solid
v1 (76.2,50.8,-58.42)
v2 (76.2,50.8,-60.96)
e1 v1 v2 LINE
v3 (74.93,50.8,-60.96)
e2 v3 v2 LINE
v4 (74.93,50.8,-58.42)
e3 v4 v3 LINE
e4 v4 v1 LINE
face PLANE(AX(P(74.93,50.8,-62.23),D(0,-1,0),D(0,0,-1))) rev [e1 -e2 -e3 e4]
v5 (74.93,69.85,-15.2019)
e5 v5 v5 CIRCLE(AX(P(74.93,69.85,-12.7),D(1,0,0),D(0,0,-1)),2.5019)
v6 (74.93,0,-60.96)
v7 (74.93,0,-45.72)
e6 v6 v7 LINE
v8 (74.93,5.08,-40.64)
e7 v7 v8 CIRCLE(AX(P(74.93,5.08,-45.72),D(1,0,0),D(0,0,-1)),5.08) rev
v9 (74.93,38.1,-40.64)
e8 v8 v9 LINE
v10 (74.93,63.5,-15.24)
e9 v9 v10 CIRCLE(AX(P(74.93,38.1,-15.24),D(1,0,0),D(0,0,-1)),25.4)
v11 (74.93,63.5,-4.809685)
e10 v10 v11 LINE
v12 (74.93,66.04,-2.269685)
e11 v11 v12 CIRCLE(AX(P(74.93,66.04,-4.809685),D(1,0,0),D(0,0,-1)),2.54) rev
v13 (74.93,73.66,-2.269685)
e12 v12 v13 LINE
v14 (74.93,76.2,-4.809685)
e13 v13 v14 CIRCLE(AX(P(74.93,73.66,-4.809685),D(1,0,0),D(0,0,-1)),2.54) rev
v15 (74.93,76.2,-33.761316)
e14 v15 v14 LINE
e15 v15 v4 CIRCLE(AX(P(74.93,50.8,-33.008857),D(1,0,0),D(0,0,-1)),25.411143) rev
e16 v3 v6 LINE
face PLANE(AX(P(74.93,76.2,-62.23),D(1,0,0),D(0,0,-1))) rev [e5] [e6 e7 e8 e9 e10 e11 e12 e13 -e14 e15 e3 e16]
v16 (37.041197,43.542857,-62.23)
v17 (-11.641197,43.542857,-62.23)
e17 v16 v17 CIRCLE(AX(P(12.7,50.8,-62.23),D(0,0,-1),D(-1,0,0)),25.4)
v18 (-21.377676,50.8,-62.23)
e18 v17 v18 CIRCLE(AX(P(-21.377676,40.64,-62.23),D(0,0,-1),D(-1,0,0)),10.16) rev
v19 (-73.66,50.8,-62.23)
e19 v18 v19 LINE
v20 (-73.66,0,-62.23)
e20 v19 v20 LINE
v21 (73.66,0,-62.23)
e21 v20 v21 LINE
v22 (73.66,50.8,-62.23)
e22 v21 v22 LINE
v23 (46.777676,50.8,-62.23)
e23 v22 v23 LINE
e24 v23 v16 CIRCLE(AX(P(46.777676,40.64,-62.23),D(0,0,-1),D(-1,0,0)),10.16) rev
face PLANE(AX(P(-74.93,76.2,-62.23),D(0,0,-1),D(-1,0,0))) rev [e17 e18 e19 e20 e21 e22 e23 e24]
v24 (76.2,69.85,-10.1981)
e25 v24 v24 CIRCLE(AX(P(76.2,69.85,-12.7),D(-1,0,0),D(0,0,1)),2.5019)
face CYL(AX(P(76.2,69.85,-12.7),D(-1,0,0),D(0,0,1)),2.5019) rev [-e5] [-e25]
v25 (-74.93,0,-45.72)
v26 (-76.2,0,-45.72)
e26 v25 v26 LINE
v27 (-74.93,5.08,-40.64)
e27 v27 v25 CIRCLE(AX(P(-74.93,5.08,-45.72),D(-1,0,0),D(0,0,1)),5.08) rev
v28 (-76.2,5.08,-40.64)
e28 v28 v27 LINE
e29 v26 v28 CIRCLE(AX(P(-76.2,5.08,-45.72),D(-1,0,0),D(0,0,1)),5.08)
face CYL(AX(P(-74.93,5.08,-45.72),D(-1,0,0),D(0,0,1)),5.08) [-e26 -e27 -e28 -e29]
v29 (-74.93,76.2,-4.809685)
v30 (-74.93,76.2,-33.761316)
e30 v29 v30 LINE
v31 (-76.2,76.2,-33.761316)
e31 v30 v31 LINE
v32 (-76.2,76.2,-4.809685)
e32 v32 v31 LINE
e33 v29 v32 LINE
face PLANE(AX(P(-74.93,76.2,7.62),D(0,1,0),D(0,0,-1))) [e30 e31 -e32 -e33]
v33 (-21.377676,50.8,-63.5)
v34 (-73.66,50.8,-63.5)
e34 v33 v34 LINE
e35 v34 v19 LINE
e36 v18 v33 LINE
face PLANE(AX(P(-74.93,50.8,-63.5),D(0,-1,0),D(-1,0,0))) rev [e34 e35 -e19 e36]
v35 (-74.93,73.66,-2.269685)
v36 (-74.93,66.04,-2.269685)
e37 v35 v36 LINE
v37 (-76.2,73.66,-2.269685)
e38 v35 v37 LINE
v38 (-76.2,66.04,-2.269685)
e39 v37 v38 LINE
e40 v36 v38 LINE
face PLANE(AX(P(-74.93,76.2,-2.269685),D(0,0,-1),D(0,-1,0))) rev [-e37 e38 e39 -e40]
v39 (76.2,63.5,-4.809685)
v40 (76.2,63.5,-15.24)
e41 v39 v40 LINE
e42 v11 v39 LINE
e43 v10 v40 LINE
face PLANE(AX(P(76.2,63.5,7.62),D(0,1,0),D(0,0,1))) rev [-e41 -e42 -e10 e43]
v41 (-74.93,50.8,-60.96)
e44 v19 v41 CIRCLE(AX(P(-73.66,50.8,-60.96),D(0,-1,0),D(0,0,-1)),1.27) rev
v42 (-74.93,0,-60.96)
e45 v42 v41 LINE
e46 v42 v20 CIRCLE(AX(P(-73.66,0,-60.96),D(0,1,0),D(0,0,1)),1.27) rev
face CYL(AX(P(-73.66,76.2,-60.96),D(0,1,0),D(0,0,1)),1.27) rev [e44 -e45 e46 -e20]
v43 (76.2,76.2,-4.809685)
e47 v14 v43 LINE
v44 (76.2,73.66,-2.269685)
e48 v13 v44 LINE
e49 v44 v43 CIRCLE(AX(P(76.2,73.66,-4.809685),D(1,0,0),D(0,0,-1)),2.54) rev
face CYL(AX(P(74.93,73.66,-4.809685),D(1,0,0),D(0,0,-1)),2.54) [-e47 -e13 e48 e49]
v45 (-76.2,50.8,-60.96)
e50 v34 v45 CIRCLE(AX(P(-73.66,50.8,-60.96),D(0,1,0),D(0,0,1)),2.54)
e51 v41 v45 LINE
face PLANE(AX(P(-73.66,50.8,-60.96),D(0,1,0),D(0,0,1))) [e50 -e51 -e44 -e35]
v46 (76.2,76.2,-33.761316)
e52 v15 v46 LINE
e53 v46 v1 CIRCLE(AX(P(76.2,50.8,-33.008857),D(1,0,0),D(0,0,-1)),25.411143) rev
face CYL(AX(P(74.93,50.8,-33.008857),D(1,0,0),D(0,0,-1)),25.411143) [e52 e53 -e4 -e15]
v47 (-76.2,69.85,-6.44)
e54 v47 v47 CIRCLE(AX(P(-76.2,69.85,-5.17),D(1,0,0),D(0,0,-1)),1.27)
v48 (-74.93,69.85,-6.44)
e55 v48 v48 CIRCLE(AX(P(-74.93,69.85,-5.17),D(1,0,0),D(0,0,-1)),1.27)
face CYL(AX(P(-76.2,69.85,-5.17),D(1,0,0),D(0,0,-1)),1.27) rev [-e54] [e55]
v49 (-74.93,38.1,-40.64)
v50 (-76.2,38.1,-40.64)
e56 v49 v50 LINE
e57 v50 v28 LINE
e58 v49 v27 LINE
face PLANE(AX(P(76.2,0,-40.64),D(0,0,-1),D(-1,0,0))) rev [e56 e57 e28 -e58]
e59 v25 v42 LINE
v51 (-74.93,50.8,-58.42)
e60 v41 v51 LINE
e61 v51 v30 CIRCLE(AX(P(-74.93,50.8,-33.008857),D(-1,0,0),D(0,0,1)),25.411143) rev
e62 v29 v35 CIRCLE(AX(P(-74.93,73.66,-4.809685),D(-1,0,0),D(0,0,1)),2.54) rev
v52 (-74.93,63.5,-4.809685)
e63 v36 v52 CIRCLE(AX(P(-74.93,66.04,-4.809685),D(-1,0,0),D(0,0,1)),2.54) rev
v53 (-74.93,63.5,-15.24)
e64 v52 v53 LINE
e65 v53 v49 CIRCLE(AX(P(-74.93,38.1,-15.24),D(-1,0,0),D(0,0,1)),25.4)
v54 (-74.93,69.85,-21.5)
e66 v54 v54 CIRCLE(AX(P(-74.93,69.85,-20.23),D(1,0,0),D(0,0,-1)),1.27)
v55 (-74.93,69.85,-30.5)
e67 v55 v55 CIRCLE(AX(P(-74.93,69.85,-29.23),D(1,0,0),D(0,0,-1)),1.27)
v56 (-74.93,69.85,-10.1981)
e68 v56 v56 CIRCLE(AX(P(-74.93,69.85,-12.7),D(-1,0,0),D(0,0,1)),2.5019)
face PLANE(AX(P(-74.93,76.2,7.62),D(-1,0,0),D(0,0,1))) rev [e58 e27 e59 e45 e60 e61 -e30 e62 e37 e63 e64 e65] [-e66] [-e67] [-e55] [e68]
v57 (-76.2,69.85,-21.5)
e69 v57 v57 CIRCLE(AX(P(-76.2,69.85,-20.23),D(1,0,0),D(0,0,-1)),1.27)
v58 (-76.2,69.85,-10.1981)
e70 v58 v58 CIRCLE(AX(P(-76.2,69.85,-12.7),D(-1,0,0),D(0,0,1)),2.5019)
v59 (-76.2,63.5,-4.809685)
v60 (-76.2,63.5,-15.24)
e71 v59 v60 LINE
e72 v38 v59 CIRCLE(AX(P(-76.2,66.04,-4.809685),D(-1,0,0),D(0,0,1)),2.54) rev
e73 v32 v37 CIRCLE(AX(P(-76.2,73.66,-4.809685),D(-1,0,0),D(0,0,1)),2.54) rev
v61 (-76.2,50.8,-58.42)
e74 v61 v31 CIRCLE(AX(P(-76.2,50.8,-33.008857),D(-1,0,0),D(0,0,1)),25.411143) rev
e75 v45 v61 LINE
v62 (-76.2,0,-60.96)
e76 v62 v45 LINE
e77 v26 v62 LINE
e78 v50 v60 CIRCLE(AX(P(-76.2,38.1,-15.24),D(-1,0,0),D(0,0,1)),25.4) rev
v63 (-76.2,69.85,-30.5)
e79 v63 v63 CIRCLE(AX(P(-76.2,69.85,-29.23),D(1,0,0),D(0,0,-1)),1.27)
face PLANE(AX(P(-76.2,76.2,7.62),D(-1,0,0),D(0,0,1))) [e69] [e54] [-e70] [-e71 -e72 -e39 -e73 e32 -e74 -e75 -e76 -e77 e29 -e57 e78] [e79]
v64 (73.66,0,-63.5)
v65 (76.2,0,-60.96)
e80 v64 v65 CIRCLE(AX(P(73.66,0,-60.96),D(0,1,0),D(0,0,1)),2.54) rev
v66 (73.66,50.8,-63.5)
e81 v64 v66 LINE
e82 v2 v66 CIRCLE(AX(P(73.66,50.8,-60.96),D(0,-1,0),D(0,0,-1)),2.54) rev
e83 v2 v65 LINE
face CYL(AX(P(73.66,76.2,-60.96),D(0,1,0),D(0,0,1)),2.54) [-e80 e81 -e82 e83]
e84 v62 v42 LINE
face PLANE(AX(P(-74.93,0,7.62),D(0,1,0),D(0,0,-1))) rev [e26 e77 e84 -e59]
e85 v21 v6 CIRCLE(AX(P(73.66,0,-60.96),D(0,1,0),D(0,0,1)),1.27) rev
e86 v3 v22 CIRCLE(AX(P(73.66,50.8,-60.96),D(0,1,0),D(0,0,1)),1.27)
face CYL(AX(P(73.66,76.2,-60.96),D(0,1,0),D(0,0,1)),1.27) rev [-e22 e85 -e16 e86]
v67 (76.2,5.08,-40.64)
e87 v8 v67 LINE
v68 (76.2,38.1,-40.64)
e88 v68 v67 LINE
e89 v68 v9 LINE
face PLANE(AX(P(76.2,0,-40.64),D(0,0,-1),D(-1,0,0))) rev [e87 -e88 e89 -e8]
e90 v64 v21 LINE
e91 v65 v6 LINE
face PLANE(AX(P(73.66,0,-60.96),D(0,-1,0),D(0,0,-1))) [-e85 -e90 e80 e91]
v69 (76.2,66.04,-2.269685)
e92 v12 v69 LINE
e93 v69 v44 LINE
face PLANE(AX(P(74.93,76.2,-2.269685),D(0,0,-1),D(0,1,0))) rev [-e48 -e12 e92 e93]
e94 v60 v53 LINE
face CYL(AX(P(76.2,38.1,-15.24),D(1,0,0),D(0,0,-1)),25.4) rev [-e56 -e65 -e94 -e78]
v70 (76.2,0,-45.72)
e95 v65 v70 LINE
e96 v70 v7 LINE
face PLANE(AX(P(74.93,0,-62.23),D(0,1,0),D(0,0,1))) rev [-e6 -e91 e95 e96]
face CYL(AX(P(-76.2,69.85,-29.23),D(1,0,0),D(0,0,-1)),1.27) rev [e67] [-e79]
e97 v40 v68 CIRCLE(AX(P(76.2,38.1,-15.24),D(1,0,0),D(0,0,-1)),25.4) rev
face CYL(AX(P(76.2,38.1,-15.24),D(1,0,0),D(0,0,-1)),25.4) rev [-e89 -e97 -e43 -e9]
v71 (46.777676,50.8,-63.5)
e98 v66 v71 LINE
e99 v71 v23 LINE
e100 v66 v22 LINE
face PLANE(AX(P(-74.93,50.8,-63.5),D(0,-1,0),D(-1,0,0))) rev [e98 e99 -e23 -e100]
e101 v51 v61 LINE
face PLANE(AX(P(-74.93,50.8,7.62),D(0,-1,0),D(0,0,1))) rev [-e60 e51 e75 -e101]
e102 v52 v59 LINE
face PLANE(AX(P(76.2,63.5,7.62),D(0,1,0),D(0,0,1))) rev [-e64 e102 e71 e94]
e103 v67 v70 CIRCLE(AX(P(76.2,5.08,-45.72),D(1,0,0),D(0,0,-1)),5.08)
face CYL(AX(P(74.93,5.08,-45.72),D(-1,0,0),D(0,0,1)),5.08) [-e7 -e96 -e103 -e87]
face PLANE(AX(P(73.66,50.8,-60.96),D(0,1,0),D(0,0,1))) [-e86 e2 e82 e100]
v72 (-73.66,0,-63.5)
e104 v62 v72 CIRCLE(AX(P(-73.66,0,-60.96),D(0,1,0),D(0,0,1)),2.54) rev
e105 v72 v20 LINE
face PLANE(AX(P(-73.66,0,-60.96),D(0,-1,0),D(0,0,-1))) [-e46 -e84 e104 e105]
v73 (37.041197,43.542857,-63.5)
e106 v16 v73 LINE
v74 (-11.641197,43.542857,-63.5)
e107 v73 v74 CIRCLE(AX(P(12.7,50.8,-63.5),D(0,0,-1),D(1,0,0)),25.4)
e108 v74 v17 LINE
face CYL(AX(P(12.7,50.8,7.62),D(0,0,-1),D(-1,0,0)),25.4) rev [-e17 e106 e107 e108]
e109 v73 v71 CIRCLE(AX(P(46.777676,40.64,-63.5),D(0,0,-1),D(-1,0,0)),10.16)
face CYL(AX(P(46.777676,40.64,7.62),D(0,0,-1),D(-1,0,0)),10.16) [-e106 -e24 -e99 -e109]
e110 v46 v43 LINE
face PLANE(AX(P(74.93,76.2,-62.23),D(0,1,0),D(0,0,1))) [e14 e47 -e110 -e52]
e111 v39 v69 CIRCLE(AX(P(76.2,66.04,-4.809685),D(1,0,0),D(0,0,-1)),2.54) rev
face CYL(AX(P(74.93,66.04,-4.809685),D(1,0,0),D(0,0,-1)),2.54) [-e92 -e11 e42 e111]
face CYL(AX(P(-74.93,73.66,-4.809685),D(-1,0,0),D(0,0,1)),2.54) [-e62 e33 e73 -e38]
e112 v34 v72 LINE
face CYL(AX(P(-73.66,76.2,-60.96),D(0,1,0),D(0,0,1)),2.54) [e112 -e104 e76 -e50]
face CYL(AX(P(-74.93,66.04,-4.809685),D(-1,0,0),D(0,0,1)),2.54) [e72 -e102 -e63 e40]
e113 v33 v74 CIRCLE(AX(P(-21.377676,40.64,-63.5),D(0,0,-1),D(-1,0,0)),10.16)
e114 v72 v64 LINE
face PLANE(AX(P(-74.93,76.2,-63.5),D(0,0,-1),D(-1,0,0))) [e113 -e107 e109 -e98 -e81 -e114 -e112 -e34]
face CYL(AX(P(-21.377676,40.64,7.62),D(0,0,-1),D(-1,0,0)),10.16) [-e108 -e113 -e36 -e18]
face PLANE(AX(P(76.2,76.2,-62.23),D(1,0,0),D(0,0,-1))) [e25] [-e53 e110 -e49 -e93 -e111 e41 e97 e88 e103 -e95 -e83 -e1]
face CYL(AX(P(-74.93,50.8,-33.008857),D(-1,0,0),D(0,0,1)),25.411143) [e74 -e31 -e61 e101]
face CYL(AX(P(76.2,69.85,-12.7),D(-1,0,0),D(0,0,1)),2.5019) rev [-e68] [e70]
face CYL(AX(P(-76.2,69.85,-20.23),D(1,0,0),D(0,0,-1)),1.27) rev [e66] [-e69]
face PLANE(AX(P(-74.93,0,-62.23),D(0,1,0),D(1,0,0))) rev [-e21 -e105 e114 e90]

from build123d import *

# Parameters (mm, degrees)
BOSS_EXTRUDE1_DEPTH    = 76.2
CONVERT_SOLID1_DEPTH   = 76.2
CONVERT_SOLID1_2_DEPTH = 76.2
SKETCH6_R              = 2.5019
CUT_EXTRUDE1_DEPTH     = 182.836327504
SKETCH8_W              = 48.26
SKETCH8_H              = 63.5
CUT_EXTRUDE2_DEPTH     = 182.836327504
CUT_EXTRUDE4_DEPTH     = 182.836327504
FILLET1_R              = 25.4
FILLET2_R              = 5.08
FILLET3_R              = 5.08
SKETCH12_R             = 1.27
CUT_EXTRUDE5_DEPTH     = 181.773247191
CUT_EXTRUDE7_DEPTH     = 130.115972676
FILLET4_R              = 10.16
CUT_EXTRUDE8_DEPTH     = 182.836327504


# Read off the part's stored shape, not the designer's step: Convert-Solid1
with BuildPart() as part:
    # Sketch1 → Boss-Extrude1 (new body)
    with BuildSketch(Plane(origin=(0, 0, 0), x_dir=(1, 0, 0), z_dir=(0, 1, 0))):
        Polygon((-76.2, -7.62), (-76.2, 63.5), (76.2, 63.5), (76.2, -7.62), (74.93, -7.62), (74.93, 62.23), (-74.93, 62.23), (-74.93, -7.62), align=None)
    extrude(amount=BOSS_EXTRUDE1_DEPTH)

    # Convert-Solid1 outline → Convert-Solid1 (cut)
    with BuildSketch(Plane(origin=(0, 0, 0), x_dir=(1, 0, 0), z_dir=(0, 1, 0))):
        with BuildLine():
            Line((76.2, 63.5), (73.66, 63.5))
            ThreePointArc((73.66, 63.5), (75.456051224, 62.756051224), (76.2, 60.96))
            Line((76.2, 60.96), (76.2, 63.5))
        make_face()
        with BuildLine():
            ThreePointArc((-76.2, 60.96), (-75.456051224, 62.756051224), (-73.66, 63.5))
            Line((-73.66, 63.5), (-76.2, 63.5))
            Line((-76.2, 63.5), (-76.2, 60.96))
        make_face()
    extrude(amount=CONVERT_SOLID1_DEPTH, mode=Mode.SUBTRACT)

    # Convert-Solid1 2 outline → Convert-Solid1 2 (add)
    with BuildSketch(Plane(origin=(0, 0, 0), x_dir=(1, 0, 0), z_dir=(0, 1, 0))):
        with BuildLine():
            Line((74.93, 62.23), (73.66, 62.23))
            ThreePointArc((73.66, 62.23), (74.558025612, 61.858025612), (74.93, 60.96))
            Line((74.93, 60.96), (74.93, 62.23))
        make_face()
        with BuildLine():
            ThreePointArc((-74.93, 60.96), (-74.558025612, 61.858025612), (-73.66, 62.23))
            Line((-73.66, 62.23), (-74.93, 62.23))
            Line((-74.93, 62.23), (-74.93, 60.96))
        make_face()
    extrude(amount=CONVERT_SOLID1_2_DEPTH)

    # Sketch6 → Cut-Extrude1 (cut, through all)
    with BuildSketch(Plane.ZY.offset(76.2)):
        with Locations((-12.7, 69.85)):
            Circle(SKETCH6_R)
    extrude(amount=-CUT_EXTRUDE1_DEPTH, mode=Mode.SUBTRACT)

    # Sketch8 → Cut-Extrude2 (cut, through all)
    with BuildSketch(Plane.ZY.offset(76.2)):
        with Locations((-16.51, 31.75)):
            Rectangle(SKETCH8_W, SKETCH8_H)
    extrude(amount=-CUT_EXTRUDE2_DEPTH, mode=Mode.SUBTRACT)

    # Sketch10 → Cut-Extrude4 (cut, through all)
    with BuildSketch(Plane.ZY.offset(76.2)):
        with BuildLine():
            Line((-60.96, 50.8), (-58.42, 50.8))
            ThreePointArc((-58.42, 50.8), (-51.241342053, 68.500358158), (-33.761315614, 76.2))
            Line((-33.761315614, 76.2), (-33.761315614, 89.340618928))
            Line((-33.761315614, 89.340618928), (-74.373162464, 89.340618928))
            Line((-74.373162464, 89.340618928), (-74.373162464, 50.8))
            Line((-74.373162464, 50.8), (-60.96, 50.8))
        make_face()
    extrude(amount=-CUT_EXTRUDE4_DEPTH, mode=Mode.SUBTRACT)

    # Fillet1
    fillet1_edges = [part.edges().sort_by_distance(p)[0] for p in [
        (75.565, 63.5, -40.64),
        (-75.565, 63.5, -40.64),
    ]]
    fillet(fillet1_edges, radius=FILLET1_R)

    # Fillet2
    fillet2_edges = [part.edges().sort_by_distance(p)[0] for p in [
        (75.565, 76.2, 7.62),
        (-75.565, 76.2, 7.62),
        (75.565, 63.5, 7.62),
        (-75.565, 63.5, 7.62),
    ]]
    fillet(fillet2_edges, radius=FILLET2_R)

    # Fillet3
    fillet3_edges = [part.edges().sort_by_distance(p)[0] for p in [
        (75.565, 0, -40.64),
        (-75.565, 0, -40.64),
    ]]
    fillet(fillet3_edges, radius=FILLET3_R)

    # Sketch12 → Cut-Extrude5 (cut, through all)
    with BuildSketch(Plane(origin=(-74.93, 0, 0), x_dir=(0, 0, -1), z_dir=(1, 0, 0))):
        with Locations((29.23, 69.85)):
            Circle(SKETCH12_R)
        with Locations((20.23, 69.85)):
            Circle(SKETCH12_R)
        with Locations((5.17, 69.85)):
            Circle(SKETCH12_R)
    extrude(amount=-CUT_EXTRUDE5_DEPTH, mode=Mode.SUBTRACT)

    # Sketch14 → Cut-Extrude7 (cut, through all)
    with BuildSketch(Plane(origin=(0, 0, -63.5), x_dir=(-1, 0, 0), z_dir=(0, 0, -1))):
        with BuildLine():
            Line((12.7, 50.8), (1.071870333, 91.408147598))
            Line((1.071870333, 91.408147598), (-38.1, 50.8))
            ThreePointArc((-38.1, 50.8), (-12.7, 25.4), (12.7, 50.8))
        make_face()
    extrude(amount=-CUT_EXTRUDE7_DEPTH, mode=Mode.SUBTRACT)

    # Fillet4
    fillet4_edges = [part.edges().sort_by_distance(p)[0] for p in [
        (-12.7, 50.8, -62.865),
        (38.1, 50.8, -62.865),
    ]]
    fillet(fillet4_edges, radius=FILLET4_R)

    # Sketch15 → Cut-Extrude8 (cut, through all)
    with BuildSketch(Plane.ZY.offset(76.2)):
        with BuildLine():
            Line((-5.770454057, 63.5), (-4.809684624, 63.5))
            ThreePointArc((-4.809684624, 63.5), (-3.0136334, 64.243948776), (-2.269684624, 66.04))
            Line((-2.269684624, 66.04), (-2.269684624, 73.66))
            ThreePointArc((-2.269684624, 73.66), (-3.0136334, 75.456051224), (-4.809684624, 76.2))
            Line((-4.809684624, 76.2), (-5.770454057, 76.2))
            Line((-5.770454057, 76.2), (-1.678645629, 79.389355871))
            Line((-1.678645629, 79.389355871), (6.777461653, 78.341276838))
            Line((6.777461653, 78.341276838), (9.50563074, 68.386937654))
            Line((9.50563074, 68.386937654), (3.09513087, 60.066927184))
            Line((3.09513087, 60.066927184), (-5.770454057, 60.066927184))
            Line((-5.770454057, 60.066927184), (-5.770454057, 63.5))
        make_face()
    extrude(amount=-CUT_EXTRUDE8_DEPTH, mode=Mode.SUBTRACT)


solid = part.part
